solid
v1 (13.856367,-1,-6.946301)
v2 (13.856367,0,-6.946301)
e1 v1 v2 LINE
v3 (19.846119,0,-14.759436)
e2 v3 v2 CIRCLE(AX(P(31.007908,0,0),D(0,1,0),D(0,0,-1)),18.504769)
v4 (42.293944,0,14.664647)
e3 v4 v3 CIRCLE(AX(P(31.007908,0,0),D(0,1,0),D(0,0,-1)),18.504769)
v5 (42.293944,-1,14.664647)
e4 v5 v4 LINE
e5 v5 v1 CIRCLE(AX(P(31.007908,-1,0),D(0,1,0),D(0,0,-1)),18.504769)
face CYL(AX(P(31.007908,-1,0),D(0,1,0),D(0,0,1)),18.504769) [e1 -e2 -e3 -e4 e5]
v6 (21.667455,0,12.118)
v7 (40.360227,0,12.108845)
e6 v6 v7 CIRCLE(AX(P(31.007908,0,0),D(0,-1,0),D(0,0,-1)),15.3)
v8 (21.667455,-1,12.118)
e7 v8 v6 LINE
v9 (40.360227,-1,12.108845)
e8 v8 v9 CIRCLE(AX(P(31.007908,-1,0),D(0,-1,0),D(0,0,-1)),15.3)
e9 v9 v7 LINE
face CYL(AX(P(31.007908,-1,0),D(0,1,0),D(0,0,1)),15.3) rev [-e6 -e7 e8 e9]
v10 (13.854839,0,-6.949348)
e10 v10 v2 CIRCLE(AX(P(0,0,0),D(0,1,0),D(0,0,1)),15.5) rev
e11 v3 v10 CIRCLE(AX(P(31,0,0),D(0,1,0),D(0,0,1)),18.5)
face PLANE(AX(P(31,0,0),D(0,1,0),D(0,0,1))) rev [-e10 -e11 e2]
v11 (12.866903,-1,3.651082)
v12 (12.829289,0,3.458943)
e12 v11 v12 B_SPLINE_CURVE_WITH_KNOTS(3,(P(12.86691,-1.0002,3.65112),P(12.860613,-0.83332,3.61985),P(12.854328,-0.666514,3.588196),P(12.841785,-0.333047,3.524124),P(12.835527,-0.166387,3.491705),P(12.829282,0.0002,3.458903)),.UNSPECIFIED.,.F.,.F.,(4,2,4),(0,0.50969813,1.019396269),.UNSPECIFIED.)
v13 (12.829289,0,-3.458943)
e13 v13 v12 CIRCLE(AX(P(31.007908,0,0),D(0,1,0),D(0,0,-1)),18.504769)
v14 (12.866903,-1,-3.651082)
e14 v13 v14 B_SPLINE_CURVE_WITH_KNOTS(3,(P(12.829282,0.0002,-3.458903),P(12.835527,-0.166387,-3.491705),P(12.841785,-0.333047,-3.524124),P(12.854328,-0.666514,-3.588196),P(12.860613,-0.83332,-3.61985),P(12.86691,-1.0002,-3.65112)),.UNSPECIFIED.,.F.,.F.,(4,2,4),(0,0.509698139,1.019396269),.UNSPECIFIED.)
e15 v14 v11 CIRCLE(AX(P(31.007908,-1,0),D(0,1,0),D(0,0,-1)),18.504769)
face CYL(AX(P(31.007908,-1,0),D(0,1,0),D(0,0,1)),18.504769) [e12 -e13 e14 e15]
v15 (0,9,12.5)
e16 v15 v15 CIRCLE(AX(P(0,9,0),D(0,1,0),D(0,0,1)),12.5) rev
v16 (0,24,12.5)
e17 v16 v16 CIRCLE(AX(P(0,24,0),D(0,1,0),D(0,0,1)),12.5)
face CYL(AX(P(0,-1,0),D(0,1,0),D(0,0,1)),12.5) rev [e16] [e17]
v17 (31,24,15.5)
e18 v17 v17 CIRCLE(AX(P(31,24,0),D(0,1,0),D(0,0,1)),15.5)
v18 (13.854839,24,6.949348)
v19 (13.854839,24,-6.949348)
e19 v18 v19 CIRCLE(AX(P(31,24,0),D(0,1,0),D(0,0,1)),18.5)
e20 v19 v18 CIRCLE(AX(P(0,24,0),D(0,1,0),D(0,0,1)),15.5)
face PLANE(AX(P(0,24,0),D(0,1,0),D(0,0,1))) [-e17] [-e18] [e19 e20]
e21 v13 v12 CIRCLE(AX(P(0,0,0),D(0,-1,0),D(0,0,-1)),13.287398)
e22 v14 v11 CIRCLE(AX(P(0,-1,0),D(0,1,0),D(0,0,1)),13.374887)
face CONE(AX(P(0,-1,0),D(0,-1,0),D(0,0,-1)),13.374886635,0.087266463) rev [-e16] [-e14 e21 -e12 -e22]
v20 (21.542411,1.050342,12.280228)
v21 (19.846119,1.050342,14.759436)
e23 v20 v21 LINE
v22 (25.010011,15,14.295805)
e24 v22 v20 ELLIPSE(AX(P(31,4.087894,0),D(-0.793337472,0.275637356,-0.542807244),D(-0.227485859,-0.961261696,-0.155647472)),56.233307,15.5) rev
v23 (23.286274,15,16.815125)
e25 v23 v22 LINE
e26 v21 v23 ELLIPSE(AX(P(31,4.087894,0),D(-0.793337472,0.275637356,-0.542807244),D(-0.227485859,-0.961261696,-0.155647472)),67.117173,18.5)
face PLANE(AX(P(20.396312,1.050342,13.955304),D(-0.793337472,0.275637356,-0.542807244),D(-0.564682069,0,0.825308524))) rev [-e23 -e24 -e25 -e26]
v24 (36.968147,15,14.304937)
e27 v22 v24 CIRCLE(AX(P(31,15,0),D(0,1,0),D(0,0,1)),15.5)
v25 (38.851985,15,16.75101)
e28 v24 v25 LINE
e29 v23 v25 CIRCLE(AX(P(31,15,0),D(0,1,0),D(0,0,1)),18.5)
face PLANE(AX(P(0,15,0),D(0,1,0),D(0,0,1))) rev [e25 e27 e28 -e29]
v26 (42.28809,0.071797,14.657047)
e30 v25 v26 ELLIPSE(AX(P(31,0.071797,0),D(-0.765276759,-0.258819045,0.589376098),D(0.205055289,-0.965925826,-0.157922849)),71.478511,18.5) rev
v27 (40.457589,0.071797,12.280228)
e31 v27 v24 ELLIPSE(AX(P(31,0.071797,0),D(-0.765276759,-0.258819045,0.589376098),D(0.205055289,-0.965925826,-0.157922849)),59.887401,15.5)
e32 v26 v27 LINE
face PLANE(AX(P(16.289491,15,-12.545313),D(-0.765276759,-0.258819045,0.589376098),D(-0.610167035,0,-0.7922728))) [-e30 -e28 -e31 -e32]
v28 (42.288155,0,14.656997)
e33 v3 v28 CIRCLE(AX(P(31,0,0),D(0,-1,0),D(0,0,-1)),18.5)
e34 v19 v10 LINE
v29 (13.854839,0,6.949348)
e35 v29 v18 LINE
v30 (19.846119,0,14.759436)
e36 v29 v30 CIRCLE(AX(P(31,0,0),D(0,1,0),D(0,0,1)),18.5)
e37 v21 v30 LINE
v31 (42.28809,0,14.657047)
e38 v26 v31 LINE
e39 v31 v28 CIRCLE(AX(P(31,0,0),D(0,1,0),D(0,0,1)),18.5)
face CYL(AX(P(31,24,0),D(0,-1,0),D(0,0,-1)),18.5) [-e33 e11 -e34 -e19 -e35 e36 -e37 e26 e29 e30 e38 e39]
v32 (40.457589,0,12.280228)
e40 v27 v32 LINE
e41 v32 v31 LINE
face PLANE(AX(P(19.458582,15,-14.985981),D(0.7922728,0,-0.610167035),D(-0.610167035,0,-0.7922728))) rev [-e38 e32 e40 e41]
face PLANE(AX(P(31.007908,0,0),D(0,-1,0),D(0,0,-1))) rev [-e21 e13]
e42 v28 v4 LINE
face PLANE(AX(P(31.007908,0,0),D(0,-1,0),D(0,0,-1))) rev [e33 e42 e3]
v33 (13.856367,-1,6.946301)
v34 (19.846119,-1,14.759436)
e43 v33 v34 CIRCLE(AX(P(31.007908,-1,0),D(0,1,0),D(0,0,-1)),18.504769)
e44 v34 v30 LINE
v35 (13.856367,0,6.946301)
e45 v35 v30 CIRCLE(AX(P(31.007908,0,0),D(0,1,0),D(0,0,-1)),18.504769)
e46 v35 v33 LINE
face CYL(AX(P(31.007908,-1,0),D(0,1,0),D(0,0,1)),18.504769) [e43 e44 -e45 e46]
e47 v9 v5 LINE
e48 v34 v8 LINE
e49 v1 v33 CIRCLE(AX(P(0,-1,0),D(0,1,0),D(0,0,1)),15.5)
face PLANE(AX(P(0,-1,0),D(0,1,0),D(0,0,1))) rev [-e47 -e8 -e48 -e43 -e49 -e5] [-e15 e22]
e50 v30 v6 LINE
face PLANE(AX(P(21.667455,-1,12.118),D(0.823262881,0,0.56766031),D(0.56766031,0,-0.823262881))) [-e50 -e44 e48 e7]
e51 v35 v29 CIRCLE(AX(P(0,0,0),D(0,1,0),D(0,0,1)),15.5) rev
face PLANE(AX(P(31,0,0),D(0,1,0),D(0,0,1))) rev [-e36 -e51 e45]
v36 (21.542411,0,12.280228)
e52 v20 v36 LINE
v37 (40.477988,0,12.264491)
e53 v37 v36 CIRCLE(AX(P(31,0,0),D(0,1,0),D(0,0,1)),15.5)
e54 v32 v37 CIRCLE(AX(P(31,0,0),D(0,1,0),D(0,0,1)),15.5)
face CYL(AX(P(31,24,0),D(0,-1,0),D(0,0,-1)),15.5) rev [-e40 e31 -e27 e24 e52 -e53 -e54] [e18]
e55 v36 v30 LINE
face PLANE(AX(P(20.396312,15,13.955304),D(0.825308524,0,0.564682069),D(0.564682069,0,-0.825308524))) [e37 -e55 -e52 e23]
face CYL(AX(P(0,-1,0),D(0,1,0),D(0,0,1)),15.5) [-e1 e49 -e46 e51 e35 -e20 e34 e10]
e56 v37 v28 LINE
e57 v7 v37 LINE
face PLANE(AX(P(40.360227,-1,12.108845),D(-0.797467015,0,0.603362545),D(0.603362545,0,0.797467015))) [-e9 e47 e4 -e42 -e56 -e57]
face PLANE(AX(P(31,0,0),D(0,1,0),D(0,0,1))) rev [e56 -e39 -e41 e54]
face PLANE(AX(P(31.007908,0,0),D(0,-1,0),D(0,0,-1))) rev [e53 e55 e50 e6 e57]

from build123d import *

# Parameters (mm, degrees)
BOSS_EXTRU_6_DEPTH      = 24
BOSS_EXTRU_6_DEPTH_BACK = 1
ESQUISSE2_R             = 15.5
ESQUISSE2_R_2           = 12.5
ESQUISSE3_R             = 18.5
ESQUISSE3_R_2           = 15.5
BOSS_EXTRU_7_DEPTH      = 24
ENL_V_MAT_EXTRU_4_DEPTH = 15
CHANFREIN3_SIZE         = 10
CHANFREIN3_SIZE2        = 0.874886635
CHANFREIN4_SIZE         = 4
CHANFREIN4_SIZE2        = 13.949657775
CHANFREIN5_SIZE         = 4
CHANFREIN5_SIZE2        = 14.92820323
BOSS_EXTRU_9_DEPTH      = 1


with BuildPart() as part:
    # Esquisse2 → Boss.-Extru.6 (new, two sides: drawn at the far end of the back side and taken through both)
    with BuildSketch(Plane(origin=(0, 0, 0), x_dir=(1, 0, 0), z_dir=(0, 1, 0)).offset(-BOSS_EXTRU_6_DEPTH_BACK)):
        Circle(ESQUISSE2_R)
        Circle(ESQUISSE2_R_2, mode=Mode.SUBTRACT)
    extrude(amount=BOSS_EXTRU_6_DEPTH + BOSS_EXTRU_6_DEPTH_BACK)

    # Esquisse3 → Boss.-Extru.7 (add)
    with BuildSketch(Plane(origin=(0, 0, 0), x_dir=(1, 0, 0), z_dir=(0, 1, 0))):
        with Locations((31, 0)):
            Circle(ESQUISSE3_R)
        with Locations((31, 0)):
            Circle(ESQUISSE3_R_2, mode=Mode.SUBTRACT)
    extrude(amount=BOSS_EXTRU_7_DEPTH)

    # Esquisse6 → Enlèv. mat.-Extru.4 (cut)
    with BuildSketch(Plane(origin=(0, 0, 0), x_dir=(1, 0, 0), z_dir=(0, 1, 0))):
        with BuildLine():
            ThreePointArc((40.457589045, -12.280228396), (31, -15.5), (21.542410955, -12.280228396))
            Line((21.542410955, -12.280228396), (19.846119293, -14.759435801))
            ThreePointArc((19.846119293, -14.759435801), (31.084403323, -18.499807461), (42.288090151, -14.657046795))
            Line((42.288090151, -14.657046795), (40.457589045, -12.280228396))
        make_face()
    extrude(amount=ENL_V_MAT_EXTRU_4_DEPTH, mode=Mode.SUBTRACT)

    # Chanfrein3
    chanfrein3_edges = [part.edges().sort_by_distance(p)[0] for p in [
        (-12.5, -1, 0),
    ]]
    chanfrein3_side = [part.faces().sort_by_distance(p)[0] for p in [
        (-12.5, 11.5, 0),
    ]]
    chamfer(chanfrein3_edges, length=CHANFREIN3_SIZE, length2=CHANFREIN3_SIZE2, reference=chanfrein3_side[0])

    # Chanfrein4
    chanfrein4_edges = [part.edges().sort_by_distance(p)[0] for p in [
        (20.694265124, 15, 13.519832098),
    ]]
    chanfrein4_side = [part.faces().sort_by_distance(p)[0] for p in [
        (31.040377675, 15, 15.854130796),
    ]]
    chamfer(chanfrein4_edges, length=CHANFREIN4_SIZE, length2=CHANFREIN4_SIZE2, reference=chanfrein4_side[0])

    # Chanfrein5
    chanfrein5_edges = [part.edges().sort_by_distance(p)[0] for p in [
        (41.372839598, 15, 13.468637595),
    ]]
    chanfrein5_side = [part.faces().sort_by_distance(p)[0] for p in [
        (32.951306309, 15, 16.129493261),
    ]]
    chamfer(chanfrein5_edges, length=CHANFREIN5_SIZE, length2=CHANFREIN5_SIZE2, reference=chanfrein5_side[0])

    # Esquisse18 → Boss.-Extru.9 (add)
    with BuildSketch(Plane(origin=(0, 0, 0), x_dir=(1, 0, 0), z_dir=(0, 1, 0))):
        with BuildLine():
            Line((40.360227094, -12.108845331), (42.293943816, -14.6646475))
            ThreePointArc((42.293943816, -14.6646475), (30.929770772, 18.504604183), (19.846119293, -14.759435801))
            Line((19.846119293, -14.759435801), (21.667455033, -12.118000277))
            ThreePointArc((21.667455033, -12.118000277), (31.000415105, 15.299998165), (40.360227094, -12.108845331))
        make_face()
    extrude(amount=-BOSS_EXTRU_9_DEPTH)


solid = part.part
